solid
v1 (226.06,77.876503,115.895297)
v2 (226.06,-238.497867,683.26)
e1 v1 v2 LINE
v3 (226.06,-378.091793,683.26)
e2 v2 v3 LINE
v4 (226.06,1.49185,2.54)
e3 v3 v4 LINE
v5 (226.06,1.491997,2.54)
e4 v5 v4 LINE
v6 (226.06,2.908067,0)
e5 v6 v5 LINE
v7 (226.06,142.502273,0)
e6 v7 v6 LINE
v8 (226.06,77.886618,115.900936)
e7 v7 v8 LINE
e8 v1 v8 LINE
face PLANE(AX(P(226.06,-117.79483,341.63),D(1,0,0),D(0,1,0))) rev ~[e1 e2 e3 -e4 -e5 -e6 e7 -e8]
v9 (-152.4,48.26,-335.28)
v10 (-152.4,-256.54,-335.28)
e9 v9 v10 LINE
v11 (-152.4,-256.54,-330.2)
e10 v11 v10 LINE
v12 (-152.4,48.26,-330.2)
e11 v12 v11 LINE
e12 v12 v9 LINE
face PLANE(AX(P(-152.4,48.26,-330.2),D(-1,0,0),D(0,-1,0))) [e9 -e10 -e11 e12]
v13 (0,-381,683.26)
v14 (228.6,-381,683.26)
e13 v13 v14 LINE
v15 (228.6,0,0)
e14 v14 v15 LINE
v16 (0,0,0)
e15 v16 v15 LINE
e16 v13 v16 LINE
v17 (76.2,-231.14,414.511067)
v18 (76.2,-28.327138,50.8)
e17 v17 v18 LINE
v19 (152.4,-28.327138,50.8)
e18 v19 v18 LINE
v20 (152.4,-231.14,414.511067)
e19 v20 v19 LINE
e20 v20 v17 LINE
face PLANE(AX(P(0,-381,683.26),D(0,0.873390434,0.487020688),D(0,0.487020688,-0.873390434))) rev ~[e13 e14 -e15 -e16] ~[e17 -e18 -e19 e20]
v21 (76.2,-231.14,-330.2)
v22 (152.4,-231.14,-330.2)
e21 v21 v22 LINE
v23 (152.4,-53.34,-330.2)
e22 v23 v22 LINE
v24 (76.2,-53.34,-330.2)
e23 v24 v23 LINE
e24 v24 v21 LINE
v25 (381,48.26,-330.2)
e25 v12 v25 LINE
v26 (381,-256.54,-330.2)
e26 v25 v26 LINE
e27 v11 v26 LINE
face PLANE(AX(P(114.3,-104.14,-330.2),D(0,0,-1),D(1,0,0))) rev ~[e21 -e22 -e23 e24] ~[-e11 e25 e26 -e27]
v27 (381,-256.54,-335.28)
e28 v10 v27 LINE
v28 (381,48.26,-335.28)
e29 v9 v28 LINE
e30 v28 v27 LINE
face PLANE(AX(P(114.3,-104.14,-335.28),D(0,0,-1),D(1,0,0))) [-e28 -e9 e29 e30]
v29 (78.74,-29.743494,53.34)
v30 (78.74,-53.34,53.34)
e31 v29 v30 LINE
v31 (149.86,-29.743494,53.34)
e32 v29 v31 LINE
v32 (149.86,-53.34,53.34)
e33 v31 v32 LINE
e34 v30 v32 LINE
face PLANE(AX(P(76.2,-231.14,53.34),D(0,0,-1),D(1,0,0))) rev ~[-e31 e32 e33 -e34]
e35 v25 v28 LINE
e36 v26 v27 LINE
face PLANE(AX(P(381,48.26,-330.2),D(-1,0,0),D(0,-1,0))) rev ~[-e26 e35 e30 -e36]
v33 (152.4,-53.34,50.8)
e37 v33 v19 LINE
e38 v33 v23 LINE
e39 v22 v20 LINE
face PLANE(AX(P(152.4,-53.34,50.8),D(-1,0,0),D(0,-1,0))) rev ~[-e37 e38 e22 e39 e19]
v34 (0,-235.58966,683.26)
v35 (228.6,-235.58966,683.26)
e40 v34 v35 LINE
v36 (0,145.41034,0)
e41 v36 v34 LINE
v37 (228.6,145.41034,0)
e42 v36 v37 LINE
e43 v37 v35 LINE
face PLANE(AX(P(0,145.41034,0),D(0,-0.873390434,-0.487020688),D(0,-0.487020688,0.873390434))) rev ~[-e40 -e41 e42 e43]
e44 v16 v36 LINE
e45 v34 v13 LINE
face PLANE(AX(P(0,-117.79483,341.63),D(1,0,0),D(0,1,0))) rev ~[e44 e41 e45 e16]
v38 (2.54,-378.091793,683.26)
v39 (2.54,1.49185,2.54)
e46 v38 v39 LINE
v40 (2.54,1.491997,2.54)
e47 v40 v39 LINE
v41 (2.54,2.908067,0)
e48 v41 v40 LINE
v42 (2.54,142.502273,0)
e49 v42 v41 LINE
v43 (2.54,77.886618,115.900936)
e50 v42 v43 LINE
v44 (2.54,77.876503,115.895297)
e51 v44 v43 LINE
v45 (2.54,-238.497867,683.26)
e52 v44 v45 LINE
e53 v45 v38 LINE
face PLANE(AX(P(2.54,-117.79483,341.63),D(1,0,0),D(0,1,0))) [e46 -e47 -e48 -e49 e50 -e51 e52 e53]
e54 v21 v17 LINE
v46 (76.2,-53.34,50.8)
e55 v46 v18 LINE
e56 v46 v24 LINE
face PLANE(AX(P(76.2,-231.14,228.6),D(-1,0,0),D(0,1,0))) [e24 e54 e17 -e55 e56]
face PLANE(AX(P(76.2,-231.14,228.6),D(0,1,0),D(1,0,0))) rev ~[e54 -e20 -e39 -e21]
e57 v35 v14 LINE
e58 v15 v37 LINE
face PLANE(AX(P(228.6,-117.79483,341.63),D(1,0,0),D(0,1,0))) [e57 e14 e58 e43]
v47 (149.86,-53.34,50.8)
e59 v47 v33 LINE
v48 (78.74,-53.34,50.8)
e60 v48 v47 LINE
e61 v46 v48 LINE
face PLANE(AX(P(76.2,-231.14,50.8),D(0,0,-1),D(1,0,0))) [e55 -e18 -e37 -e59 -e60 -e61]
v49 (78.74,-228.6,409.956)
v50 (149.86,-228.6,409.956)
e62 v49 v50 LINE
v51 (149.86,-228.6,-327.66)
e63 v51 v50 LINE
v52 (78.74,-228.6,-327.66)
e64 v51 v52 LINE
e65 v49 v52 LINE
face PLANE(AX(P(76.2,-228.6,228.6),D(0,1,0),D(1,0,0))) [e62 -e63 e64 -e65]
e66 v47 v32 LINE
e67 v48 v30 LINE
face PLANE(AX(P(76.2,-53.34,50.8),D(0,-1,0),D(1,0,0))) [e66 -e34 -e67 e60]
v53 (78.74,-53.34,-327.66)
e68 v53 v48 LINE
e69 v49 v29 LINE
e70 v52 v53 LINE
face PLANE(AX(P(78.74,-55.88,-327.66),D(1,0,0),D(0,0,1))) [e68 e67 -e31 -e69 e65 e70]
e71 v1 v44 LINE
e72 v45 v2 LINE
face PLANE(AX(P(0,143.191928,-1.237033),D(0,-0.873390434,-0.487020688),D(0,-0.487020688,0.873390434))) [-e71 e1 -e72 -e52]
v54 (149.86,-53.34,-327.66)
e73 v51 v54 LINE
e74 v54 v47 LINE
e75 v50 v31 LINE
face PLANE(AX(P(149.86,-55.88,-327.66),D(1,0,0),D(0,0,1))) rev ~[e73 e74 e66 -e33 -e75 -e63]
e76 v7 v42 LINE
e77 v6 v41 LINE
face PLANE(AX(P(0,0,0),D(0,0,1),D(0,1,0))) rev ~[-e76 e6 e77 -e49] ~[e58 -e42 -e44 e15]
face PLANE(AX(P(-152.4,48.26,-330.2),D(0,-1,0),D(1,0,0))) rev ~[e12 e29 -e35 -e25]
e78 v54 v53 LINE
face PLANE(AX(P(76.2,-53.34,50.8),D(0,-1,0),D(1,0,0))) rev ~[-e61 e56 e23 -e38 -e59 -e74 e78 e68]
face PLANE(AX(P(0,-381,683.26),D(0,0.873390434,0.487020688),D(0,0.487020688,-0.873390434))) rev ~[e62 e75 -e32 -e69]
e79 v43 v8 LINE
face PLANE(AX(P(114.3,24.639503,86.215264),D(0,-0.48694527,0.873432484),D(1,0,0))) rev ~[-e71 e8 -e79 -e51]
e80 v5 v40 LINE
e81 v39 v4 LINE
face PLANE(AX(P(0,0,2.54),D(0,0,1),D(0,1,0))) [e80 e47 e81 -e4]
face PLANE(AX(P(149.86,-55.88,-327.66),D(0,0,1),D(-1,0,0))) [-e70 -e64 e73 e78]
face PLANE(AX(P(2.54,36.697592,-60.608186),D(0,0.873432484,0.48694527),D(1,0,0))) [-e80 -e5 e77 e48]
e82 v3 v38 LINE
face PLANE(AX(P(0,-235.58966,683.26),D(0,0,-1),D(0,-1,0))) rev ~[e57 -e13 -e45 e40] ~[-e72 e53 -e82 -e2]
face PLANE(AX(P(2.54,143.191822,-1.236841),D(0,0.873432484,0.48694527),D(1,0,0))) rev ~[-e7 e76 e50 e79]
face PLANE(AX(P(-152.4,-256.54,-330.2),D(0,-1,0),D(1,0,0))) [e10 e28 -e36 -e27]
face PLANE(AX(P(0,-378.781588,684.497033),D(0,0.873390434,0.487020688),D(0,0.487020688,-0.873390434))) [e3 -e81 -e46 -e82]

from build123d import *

# Parameters (mm, degrees)
F1_DEPTH   = 228.6
F2_T       = -2.54
F4_W       = 223.52
F4_H       = 121.926114556
F5_DEPTH   = 134.112
F7_W       = 76.2
F7_H       = 177.8
F9_W       = 76.2
F9_H       = 177.8
F10_DEPTH  = 381
F8_FACE1_W = 76.2
F8_FACE1_H = 103.6678810409
F13_T      = -2.54
F11_W      = 533.4
F11_H      = 304.8
F11_W_2    = 76.2
F11_H_2    = 177.8
F14_DEPTH  = 5.08


# Not quite as in the source:
# - a shell that OpenCascade refuses in one call is made with other operations: the cavity is built on its own and cut out
# - a feature names something its author has since deleted; it is built from what else it names


with BuildPart() as f1:
    # F0 (on Right) → F1 (new body)
    with BuildSketch(Plane.YZ):
        Polygon((-381, 683.26), (0, 0), (145.4103401064, 0), (-235.5896598936, 683.26), align=None)
    extrude(amount=F1_DEPTH)

    # F2
    f2_openings = [f1.faces().sort_by_distance(p)[0] for p in [
        (114.3, -308.29483, 683.26),
    ]]
    offset(amount=F2_T, openings=f2_openings)

    # F4 (on face) → F5 (cut)
    with BuildSketch(Plane(origin=(0, 34.4790739886, -61.8450267372), x_dir=(1, 0, 0), z_dir=(0, -0.4869452699, 0.873432484))):
        with Locations((114.3, 63.503057278)):
            Rectangle(F4_W, F4_H)
    extrude(amount=F5_DEPTH, mode=Mode.SUBTRACT)

    # F7 (on offset) → F8 (join, up to the next surface of F1)
    with BuildSketch(Plane.XZ.offset(231.14)):
        with Locations((114.3, 139.7)):
            Rectangle(F7_W, F7_H)
    extrude(until=Until.NEXT, dir=(0, 1, 0))

    # F9 (on face) → F10 (join)
    with BuildSketch(Plane(origin=(0, 0, 50.8), x_dir=(1, 0, 0), z_dir=(0, 0, -1))):
        with Locations((114.3, 142.24)):
            Rectangle(F9_W, F9_H)
    extrude(amount=F10_DEPTH)

    # F8_face1 (on face) → F12 (join, up to the next surface of F1)
    with BuildSketch(Plane(origin=(114.3, -179.3060594796, 228.6), x_dir=(1, 0, 0), z_dir=(0, 0, 1))):
        Rectangle(F8_FACE1_W, F8_FACE1_H)
    extrude(until=Until.NEXT)

    # F13: a shell. OpenCascade refuses it in one call, so the cavity is built on its own and cut out:
    # the body offset inwards by the wall thickness, plus a prism from it out through each open face.
    f13_core = offset(f1.part, amount=F13_T, kind=Kind.INTERSECTION, mode=Mode.PRIVATE)
    f13_exits = [f13_core.faces().sort_by_distance(p)[0] for p in [
        (114.3, -55.88, -137.16),
    ]]
    add(f13_core, mode=Mode.SUBTRACT)
    extrude(f13_exits, amount=-F13_T, mode=Mode.SUBTRACT)

    # F11 (on face) → F14 (join)
    with BuildSketch(Plane(origin=(0, 0, -330.2), x_dir=(1, 0, 0), z_dir=(0, 0, -1))):
        with Locations((114.3, 104.14)):
            Rectangle(F11_W, F11_H)
        with Locations((114.3, 142.24)):
            Rectangle(F11_W_2, F11_H_2, mode=Mode.SUBTRACT)
        with Locations((114.3, 142.24)):
            Rectangle(F11_W_2, F11_H_2)
    extrude(amount=F14_DEPTH)


solid = f1.part
